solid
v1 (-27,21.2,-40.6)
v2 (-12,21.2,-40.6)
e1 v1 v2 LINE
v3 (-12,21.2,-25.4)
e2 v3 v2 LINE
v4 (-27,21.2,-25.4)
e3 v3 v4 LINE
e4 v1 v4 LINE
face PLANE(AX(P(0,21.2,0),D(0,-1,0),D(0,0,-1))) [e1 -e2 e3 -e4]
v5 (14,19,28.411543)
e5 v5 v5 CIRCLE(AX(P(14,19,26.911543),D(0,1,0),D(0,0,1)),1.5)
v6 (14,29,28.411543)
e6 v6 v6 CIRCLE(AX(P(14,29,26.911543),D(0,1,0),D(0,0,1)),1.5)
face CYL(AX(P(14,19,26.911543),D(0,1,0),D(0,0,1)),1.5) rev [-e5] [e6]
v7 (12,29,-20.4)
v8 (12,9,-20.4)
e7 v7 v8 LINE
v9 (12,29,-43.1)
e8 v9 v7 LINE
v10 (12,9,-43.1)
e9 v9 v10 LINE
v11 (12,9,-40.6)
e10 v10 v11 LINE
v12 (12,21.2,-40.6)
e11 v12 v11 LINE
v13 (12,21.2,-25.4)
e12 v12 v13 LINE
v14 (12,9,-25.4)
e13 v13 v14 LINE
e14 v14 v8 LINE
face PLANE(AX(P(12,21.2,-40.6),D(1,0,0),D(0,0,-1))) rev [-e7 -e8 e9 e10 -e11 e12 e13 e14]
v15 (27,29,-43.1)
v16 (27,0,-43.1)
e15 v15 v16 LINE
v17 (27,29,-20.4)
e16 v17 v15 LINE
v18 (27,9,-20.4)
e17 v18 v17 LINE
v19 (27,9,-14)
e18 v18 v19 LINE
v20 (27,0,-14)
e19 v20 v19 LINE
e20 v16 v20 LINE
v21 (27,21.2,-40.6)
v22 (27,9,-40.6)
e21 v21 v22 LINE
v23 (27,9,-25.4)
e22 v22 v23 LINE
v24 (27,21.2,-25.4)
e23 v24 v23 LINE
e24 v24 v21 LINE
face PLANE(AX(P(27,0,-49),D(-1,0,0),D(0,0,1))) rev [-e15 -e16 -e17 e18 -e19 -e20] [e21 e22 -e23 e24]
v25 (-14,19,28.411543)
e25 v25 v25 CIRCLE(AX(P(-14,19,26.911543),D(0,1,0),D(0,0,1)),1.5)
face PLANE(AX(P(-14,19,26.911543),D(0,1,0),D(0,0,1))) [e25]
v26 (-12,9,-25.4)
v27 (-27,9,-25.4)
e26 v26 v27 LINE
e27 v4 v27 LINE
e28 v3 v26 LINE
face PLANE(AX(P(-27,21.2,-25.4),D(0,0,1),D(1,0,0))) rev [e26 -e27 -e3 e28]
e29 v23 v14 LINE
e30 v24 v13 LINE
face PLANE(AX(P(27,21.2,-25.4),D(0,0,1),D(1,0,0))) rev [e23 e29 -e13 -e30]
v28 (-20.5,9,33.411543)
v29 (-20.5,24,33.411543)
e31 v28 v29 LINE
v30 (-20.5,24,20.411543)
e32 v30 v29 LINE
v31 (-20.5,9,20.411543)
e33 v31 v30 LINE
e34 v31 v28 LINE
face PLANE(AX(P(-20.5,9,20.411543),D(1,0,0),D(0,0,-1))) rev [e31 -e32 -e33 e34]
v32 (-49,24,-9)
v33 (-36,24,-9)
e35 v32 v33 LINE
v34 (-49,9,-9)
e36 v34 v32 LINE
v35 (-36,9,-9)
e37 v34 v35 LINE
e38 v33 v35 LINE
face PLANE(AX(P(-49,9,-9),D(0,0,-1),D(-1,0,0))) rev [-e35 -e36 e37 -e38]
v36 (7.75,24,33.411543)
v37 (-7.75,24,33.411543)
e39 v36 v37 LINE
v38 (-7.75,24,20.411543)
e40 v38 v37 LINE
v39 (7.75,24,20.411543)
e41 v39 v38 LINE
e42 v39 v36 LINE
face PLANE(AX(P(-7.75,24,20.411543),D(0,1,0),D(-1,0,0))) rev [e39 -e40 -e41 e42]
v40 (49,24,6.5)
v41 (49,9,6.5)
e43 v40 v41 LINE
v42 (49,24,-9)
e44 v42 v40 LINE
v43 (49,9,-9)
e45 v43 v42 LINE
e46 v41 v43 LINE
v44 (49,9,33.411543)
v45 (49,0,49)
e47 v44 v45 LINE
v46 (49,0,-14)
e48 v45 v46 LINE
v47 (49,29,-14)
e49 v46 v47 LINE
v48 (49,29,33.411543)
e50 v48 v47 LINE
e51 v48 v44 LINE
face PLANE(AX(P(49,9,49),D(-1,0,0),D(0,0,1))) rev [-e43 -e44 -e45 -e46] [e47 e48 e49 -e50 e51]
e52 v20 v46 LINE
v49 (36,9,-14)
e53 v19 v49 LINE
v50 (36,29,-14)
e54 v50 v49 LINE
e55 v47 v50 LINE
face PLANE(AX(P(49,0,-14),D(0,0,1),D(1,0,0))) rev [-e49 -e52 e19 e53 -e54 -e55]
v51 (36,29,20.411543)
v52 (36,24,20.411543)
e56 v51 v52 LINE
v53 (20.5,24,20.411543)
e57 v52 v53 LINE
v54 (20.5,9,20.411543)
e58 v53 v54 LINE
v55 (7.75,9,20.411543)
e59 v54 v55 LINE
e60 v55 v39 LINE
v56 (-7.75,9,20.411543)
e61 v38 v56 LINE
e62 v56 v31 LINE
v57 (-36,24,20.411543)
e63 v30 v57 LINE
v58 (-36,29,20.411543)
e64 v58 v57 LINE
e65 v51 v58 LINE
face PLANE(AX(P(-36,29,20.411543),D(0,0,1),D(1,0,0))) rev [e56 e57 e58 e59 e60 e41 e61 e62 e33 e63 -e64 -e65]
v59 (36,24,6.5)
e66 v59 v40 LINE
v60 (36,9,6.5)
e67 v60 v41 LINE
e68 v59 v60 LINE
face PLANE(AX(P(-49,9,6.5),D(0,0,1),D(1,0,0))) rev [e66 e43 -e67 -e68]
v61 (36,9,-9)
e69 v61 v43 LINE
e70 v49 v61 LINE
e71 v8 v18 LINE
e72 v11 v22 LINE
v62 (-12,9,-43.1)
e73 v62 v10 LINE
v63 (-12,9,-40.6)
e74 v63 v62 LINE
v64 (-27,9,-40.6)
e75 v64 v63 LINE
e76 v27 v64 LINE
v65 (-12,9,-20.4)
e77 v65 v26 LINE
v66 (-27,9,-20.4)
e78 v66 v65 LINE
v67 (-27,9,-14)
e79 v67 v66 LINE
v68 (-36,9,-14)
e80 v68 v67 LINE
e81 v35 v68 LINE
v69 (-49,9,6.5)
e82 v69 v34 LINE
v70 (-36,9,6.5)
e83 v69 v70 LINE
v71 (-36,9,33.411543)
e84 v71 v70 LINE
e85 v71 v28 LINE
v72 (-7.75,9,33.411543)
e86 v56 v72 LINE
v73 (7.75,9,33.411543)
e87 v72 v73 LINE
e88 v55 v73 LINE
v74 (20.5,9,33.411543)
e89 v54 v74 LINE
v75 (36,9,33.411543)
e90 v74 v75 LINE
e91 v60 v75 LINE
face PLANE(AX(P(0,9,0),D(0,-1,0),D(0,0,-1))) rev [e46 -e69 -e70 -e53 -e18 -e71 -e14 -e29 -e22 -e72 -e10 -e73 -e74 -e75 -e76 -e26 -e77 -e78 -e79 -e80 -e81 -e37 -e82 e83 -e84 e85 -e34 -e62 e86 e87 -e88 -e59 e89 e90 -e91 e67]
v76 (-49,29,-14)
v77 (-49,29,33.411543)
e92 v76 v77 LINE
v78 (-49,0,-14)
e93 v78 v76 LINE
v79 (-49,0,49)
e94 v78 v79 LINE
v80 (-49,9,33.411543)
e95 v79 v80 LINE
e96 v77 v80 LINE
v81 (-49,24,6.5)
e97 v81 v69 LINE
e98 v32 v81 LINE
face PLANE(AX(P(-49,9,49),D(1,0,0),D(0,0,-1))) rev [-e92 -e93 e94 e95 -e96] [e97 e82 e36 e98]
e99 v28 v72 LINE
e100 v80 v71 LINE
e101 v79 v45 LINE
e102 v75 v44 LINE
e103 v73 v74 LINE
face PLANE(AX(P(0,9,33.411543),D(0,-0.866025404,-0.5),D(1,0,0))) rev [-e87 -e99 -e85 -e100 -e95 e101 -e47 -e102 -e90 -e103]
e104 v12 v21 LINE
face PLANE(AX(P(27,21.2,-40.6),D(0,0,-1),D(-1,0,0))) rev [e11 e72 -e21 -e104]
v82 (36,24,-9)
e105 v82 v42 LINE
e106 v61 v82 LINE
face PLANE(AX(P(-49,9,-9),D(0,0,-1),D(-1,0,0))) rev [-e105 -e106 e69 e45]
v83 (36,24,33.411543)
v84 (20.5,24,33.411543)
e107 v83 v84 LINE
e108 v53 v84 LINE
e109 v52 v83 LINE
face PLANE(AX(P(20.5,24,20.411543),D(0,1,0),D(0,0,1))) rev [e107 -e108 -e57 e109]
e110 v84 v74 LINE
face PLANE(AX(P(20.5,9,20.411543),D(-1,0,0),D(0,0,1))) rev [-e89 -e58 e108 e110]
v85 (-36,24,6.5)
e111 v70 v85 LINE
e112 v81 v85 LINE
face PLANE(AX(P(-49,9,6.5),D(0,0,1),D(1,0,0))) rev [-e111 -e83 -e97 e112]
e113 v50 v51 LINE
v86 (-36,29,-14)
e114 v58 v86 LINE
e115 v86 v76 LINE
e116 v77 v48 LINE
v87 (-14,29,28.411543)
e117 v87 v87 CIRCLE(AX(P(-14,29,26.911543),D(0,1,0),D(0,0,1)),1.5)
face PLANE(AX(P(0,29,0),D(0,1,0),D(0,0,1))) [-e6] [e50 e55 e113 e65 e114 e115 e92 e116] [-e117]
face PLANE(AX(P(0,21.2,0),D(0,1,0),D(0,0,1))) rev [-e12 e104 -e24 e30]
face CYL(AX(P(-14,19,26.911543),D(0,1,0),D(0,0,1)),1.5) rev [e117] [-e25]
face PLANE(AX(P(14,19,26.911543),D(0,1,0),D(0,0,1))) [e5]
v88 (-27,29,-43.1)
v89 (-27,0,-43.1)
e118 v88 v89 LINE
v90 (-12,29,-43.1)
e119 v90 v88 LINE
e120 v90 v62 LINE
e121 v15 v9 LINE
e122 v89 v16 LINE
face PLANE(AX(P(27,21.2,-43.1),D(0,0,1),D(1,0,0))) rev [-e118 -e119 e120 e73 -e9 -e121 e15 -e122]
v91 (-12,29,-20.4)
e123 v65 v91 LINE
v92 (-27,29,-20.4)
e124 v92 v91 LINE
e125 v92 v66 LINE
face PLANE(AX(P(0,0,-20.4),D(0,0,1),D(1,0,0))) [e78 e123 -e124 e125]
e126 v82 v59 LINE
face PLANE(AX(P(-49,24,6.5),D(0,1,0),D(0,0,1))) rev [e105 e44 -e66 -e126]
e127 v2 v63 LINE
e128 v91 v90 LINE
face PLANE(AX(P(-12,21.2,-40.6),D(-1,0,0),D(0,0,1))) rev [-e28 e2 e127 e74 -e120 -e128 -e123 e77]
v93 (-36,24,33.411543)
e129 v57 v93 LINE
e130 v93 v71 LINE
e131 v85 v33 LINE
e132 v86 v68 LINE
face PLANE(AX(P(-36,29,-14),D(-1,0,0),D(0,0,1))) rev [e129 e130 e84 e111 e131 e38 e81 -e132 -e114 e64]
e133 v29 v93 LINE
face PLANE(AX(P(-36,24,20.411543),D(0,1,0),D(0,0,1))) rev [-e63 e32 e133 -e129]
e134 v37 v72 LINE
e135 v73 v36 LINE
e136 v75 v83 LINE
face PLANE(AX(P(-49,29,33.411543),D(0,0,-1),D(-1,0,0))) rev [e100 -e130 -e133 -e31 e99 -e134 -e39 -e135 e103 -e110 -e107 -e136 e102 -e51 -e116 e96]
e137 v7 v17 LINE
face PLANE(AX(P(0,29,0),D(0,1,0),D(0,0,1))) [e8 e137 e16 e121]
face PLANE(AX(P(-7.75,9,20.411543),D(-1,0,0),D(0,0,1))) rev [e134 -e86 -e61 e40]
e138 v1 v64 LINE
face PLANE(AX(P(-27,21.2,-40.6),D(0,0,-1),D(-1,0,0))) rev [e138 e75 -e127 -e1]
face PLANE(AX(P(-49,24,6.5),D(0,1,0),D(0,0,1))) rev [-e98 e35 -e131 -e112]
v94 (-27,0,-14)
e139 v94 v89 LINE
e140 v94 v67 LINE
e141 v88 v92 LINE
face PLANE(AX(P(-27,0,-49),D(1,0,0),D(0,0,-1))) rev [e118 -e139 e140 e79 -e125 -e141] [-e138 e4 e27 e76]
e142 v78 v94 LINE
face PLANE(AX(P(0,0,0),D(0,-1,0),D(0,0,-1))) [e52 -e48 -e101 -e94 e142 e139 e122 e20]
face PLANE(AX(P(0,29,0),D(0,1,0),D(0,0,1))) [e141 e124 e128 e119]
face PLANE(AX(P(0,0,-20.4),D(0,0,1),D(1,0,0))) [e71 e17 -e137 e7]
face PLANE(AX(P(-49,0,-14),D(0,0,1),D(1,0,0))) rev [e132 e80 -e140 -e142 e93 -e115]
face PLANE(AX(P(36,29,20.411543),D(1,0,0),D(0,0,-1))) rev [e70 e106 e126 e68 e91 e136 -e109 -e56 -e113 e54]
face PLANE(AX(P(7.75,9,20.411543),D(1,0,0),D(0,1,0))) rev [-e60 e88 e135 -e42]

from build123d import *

# Parameters (mm, degrees)
CROQUIS1_W              = 98
CROQUIS1_H              = 98
SALIENTE_EXTRUIR1_DEPTH = 9
CHAFL_N1_SIZE2          = 15.588457268
CHAFL_N1_SIZE           = 9
CROQUIS2_W              = 22
CROQUIS2_H              = 35
CORTAR_EXTRUIR1_DEPTH   = 9
CROQUIS3_W              = 15
CROQUIS3_H              = 2.5
SALIENTE_EXTRUIR2_DEPTH = 12.2
CROQUIS4_W              = 15
CROQUIS4_H              = 20.2
SALIENTE_EXTRUIR3_DEPTH = 2.5
CROQUIS5_W              = 5.9
CROQUIS5_H              = 9
CORTAR_EXTRUIR2_DEPTH   = 54.2
CROQUIS6_W              = 15
CROQUIS6_H              = 14.7
SALIENTE_EXTRUIR4_DEPTH = 2.5
SALIENTE_EXTRUIR5_DEPTH = 20
CROQUIS8_W              = 15.5
CROQUIS8_H              = 15
CORTAR_EXTRUIR3_DEPTH   = 98
CROQUIS9_W              = 15.5
CROQUIS9_H              = 15
CORTAR_EXTRUIR4_DEPTH   = 13
CROQUIS10_W             = 15
CROQUIS10_H             = 22.7
SALIENTE_EXTRUIR6_DEPTH = 5.3
CROQUIS11_R             = 1.5
CORTAR_EXTRUIR5_DEPTH   = 10


with BuildPart() as part:
    # Croquis1 → Saliente-Extruir1 (new body)
    with BuildSketch(Plane(origin=(0, 0, 0), x_dir=(1, 0, 0), z_dir=(0, 1, 0))):
        Rectangle(CROQUIS1_W, CROQUIS1_H)
    extrude(amount=SALIENTE_EXTRUIR1_DEPTH)

    # Chaflán1
    chafl_n1_edges = [part.edges().sort_by_distance(p)[0] for p in [
        (0, 9, 49),
    ]]
    chafl_n1_side = [part.faces().sort_by_distance(p)[0] for p in [
        (0, 8.82, 49),
    ]]
    chamfer(chafl_n1_edges, length=CHAFL_N1_SIZE - 0.0001, length2=CHAFL_N1_SIZE2 - 0.0001, reference=chafl_n1_side[0])  # a hair under: the kernel refuses the full size

    # Croquis2 → Cortar-Extruir1 (cut)
    with BuildSketch(Plane(origin=(0, 9, 0), x_dir=(1, 0, 0), z_dir=(0, 1, 0))):
        with Locations((-38, 31.5)):
            Rectangle(CROQUIS2_W, CROQUIS2_H)
        with Locations((38, 31.5)):
            Rectangle(CROQUIS2_W, CROQUIS2_H)
    extrude(amount=-CORTAR_EXTRUIR1_DEPTH, mode=Mode.SUBTRACT)

    # Croquis3 → Saliente-Extruir2 (add)
    with BuildSketch(Plane(origin=(0, 9, 0), x_dir=(1, 0, 0), z_dir=(0, 1, 0))):
        with Locations((19.5, 41.85)):
            Rectangle(CROQUIS3_W, CROQUIS3_H)
        with Locations((19.5, 24.15)):
            Rectangle(CROQUIS3_W, CROQUIS3_H)
        with Locations((-19.5, 41.85)):
            Rectangle(CROQUIS3_W, CROQUIS3_H)
        with Locations((-19.5, 24.15)):
            Rectangle(CROQUIS3_W, CROQUIS3_H)
    extrude(amount=SALIENTE_EXTRUIR2_DEPTH)

    # Croquis4 → Saliente-Extruir3 (add)
    with BuildSketch(Plane(origin=(0, 21.2, 0), x_dir=(1, 0, 0), z_dir=(0, 1, 0))):
        with Locations((-19.5, 33)):
            Rectangle(CROQUIS4_W, CROQUIS4_H)
        with Locations((19.5, 33)):
            Rectangle(CROQUIS4_W, CROQUIS4_H)
    extrude(amount=SALIENTE_EXTRUIR3_DEPTH)

    # Croquis5 → Cortar-Extruir2 (cut)
    with BuildSketch(Plane(origin=(27, 0, 0), x_dir=(0, 0, -1), z_dir=(1, 0, 0))):
        with Locations((46.05, 4.5)):
            Rectangle(CROQUIS5_W, CROQUIS5_H)
    extrude(amount=-CORTAR_EXTRUIR2_DEPTH, mode=Mode.SUBTRACT)

    # Croquis6 → Saliente-Extruir4 (add)
    with BuildSketch(Plane.XY.offset(-22.9)):
        with Locations((-19.5, 16.35)):
            Rectangle(CROQUIS6_W, CROQUIS6_H)
        with Locations((19.5, 16.35)):
            Rectangle(CROQUIS6_W, CROQUIS6_H)
    extrude(amount=SALIENTE_EXTRUIR4_DEPTH)

    # Croquis7 → Saliente-Extruir5 (add)
    with BuildSketch(Plane(origin=(0, 9, 0), x_dir=(1, 0, 0), z_dir=(0, 1, 0))):
        Polygon((-49, 14), (-49, -33.411542732), (49, -33.411542732), (49, 14), (36, 14), (36, -20.411542732), (-36, -20.411542732), (-36, 14), align=None)
    extrude(amount=SALIENTE_EXTRUIR5_DEPTH)

    # Croquis8 → Cortar-Extruir3 (cut)
    with BuildSketch(Plane(origin=(49, 0, 0), x_dir=(0, 0, -1), z_dir=(1, 0, 0))):
        with Locations((1.25, 16.5)):
            Rectangle(CROQUIS8_W, CROQUIS8_H)
    extrude(amount=-CORTAR_EXTRUIR3_DEPTH, mode=Mode.SUBTRACT)

    # Croquis9 → Cortar-Extruir4 (cut)
    with BuildSketch(Plane.XY.offset(33.411542732)):
        with Locations((-28.25, 16.5)):
            Rectangle(CROQUIS9_W, CROQUIS9_H)
        with Locations((0, 16.5)):
            Rectangle(CROQUIS9_W, CROQUIS9_H)
        with Locations((28.25, 16.5)):
            Rectangle(CROQUIS9_W, CROQUIS9_H)
    extrude(amount=-CORTAR_EXTRUIR4_DEPTH, mode=Mode.SUBTRACT)

    # Croquis10 → Saliente-Extruir6 (add)
    with BuildSketch(Plane(origin=(0, 23.7, 0), x_dir=(1, 0, 0), z_dir=(0, 1, 0))):
        with Locations((-19.5, 31.75)):
            Rectangle(CROQUIS10_W, CROQUIS10_H)
        with Locations((19.5, 31.75)):
            Rectangle(CROQUIS10_W, CROQUIS10_H)
    extrude(amount=SALIENTE_EXTRUIR6_DEPTH)

    # Croquis11 → Cortar-Extruir5 (cut)
    with BuildSketch(Plane(origin=(0, 29, 0), x_dir=(1, 0, 0), z_dir=(0, 1, 0))):
        with Locations(Location((-14, -26.911542732, 0), (0, 0, 270))):
            Circle(CROQUIS11_R)
        with Locations(Location((14, -26.911542732, 0), (0, 0, 270))):
            Circle(CROQUIS11_R)
    extrude(amount=-CORTAR_EXTRUIR5_DEPTH, mode=Mode.SUBTRACT)


solid = part.part
